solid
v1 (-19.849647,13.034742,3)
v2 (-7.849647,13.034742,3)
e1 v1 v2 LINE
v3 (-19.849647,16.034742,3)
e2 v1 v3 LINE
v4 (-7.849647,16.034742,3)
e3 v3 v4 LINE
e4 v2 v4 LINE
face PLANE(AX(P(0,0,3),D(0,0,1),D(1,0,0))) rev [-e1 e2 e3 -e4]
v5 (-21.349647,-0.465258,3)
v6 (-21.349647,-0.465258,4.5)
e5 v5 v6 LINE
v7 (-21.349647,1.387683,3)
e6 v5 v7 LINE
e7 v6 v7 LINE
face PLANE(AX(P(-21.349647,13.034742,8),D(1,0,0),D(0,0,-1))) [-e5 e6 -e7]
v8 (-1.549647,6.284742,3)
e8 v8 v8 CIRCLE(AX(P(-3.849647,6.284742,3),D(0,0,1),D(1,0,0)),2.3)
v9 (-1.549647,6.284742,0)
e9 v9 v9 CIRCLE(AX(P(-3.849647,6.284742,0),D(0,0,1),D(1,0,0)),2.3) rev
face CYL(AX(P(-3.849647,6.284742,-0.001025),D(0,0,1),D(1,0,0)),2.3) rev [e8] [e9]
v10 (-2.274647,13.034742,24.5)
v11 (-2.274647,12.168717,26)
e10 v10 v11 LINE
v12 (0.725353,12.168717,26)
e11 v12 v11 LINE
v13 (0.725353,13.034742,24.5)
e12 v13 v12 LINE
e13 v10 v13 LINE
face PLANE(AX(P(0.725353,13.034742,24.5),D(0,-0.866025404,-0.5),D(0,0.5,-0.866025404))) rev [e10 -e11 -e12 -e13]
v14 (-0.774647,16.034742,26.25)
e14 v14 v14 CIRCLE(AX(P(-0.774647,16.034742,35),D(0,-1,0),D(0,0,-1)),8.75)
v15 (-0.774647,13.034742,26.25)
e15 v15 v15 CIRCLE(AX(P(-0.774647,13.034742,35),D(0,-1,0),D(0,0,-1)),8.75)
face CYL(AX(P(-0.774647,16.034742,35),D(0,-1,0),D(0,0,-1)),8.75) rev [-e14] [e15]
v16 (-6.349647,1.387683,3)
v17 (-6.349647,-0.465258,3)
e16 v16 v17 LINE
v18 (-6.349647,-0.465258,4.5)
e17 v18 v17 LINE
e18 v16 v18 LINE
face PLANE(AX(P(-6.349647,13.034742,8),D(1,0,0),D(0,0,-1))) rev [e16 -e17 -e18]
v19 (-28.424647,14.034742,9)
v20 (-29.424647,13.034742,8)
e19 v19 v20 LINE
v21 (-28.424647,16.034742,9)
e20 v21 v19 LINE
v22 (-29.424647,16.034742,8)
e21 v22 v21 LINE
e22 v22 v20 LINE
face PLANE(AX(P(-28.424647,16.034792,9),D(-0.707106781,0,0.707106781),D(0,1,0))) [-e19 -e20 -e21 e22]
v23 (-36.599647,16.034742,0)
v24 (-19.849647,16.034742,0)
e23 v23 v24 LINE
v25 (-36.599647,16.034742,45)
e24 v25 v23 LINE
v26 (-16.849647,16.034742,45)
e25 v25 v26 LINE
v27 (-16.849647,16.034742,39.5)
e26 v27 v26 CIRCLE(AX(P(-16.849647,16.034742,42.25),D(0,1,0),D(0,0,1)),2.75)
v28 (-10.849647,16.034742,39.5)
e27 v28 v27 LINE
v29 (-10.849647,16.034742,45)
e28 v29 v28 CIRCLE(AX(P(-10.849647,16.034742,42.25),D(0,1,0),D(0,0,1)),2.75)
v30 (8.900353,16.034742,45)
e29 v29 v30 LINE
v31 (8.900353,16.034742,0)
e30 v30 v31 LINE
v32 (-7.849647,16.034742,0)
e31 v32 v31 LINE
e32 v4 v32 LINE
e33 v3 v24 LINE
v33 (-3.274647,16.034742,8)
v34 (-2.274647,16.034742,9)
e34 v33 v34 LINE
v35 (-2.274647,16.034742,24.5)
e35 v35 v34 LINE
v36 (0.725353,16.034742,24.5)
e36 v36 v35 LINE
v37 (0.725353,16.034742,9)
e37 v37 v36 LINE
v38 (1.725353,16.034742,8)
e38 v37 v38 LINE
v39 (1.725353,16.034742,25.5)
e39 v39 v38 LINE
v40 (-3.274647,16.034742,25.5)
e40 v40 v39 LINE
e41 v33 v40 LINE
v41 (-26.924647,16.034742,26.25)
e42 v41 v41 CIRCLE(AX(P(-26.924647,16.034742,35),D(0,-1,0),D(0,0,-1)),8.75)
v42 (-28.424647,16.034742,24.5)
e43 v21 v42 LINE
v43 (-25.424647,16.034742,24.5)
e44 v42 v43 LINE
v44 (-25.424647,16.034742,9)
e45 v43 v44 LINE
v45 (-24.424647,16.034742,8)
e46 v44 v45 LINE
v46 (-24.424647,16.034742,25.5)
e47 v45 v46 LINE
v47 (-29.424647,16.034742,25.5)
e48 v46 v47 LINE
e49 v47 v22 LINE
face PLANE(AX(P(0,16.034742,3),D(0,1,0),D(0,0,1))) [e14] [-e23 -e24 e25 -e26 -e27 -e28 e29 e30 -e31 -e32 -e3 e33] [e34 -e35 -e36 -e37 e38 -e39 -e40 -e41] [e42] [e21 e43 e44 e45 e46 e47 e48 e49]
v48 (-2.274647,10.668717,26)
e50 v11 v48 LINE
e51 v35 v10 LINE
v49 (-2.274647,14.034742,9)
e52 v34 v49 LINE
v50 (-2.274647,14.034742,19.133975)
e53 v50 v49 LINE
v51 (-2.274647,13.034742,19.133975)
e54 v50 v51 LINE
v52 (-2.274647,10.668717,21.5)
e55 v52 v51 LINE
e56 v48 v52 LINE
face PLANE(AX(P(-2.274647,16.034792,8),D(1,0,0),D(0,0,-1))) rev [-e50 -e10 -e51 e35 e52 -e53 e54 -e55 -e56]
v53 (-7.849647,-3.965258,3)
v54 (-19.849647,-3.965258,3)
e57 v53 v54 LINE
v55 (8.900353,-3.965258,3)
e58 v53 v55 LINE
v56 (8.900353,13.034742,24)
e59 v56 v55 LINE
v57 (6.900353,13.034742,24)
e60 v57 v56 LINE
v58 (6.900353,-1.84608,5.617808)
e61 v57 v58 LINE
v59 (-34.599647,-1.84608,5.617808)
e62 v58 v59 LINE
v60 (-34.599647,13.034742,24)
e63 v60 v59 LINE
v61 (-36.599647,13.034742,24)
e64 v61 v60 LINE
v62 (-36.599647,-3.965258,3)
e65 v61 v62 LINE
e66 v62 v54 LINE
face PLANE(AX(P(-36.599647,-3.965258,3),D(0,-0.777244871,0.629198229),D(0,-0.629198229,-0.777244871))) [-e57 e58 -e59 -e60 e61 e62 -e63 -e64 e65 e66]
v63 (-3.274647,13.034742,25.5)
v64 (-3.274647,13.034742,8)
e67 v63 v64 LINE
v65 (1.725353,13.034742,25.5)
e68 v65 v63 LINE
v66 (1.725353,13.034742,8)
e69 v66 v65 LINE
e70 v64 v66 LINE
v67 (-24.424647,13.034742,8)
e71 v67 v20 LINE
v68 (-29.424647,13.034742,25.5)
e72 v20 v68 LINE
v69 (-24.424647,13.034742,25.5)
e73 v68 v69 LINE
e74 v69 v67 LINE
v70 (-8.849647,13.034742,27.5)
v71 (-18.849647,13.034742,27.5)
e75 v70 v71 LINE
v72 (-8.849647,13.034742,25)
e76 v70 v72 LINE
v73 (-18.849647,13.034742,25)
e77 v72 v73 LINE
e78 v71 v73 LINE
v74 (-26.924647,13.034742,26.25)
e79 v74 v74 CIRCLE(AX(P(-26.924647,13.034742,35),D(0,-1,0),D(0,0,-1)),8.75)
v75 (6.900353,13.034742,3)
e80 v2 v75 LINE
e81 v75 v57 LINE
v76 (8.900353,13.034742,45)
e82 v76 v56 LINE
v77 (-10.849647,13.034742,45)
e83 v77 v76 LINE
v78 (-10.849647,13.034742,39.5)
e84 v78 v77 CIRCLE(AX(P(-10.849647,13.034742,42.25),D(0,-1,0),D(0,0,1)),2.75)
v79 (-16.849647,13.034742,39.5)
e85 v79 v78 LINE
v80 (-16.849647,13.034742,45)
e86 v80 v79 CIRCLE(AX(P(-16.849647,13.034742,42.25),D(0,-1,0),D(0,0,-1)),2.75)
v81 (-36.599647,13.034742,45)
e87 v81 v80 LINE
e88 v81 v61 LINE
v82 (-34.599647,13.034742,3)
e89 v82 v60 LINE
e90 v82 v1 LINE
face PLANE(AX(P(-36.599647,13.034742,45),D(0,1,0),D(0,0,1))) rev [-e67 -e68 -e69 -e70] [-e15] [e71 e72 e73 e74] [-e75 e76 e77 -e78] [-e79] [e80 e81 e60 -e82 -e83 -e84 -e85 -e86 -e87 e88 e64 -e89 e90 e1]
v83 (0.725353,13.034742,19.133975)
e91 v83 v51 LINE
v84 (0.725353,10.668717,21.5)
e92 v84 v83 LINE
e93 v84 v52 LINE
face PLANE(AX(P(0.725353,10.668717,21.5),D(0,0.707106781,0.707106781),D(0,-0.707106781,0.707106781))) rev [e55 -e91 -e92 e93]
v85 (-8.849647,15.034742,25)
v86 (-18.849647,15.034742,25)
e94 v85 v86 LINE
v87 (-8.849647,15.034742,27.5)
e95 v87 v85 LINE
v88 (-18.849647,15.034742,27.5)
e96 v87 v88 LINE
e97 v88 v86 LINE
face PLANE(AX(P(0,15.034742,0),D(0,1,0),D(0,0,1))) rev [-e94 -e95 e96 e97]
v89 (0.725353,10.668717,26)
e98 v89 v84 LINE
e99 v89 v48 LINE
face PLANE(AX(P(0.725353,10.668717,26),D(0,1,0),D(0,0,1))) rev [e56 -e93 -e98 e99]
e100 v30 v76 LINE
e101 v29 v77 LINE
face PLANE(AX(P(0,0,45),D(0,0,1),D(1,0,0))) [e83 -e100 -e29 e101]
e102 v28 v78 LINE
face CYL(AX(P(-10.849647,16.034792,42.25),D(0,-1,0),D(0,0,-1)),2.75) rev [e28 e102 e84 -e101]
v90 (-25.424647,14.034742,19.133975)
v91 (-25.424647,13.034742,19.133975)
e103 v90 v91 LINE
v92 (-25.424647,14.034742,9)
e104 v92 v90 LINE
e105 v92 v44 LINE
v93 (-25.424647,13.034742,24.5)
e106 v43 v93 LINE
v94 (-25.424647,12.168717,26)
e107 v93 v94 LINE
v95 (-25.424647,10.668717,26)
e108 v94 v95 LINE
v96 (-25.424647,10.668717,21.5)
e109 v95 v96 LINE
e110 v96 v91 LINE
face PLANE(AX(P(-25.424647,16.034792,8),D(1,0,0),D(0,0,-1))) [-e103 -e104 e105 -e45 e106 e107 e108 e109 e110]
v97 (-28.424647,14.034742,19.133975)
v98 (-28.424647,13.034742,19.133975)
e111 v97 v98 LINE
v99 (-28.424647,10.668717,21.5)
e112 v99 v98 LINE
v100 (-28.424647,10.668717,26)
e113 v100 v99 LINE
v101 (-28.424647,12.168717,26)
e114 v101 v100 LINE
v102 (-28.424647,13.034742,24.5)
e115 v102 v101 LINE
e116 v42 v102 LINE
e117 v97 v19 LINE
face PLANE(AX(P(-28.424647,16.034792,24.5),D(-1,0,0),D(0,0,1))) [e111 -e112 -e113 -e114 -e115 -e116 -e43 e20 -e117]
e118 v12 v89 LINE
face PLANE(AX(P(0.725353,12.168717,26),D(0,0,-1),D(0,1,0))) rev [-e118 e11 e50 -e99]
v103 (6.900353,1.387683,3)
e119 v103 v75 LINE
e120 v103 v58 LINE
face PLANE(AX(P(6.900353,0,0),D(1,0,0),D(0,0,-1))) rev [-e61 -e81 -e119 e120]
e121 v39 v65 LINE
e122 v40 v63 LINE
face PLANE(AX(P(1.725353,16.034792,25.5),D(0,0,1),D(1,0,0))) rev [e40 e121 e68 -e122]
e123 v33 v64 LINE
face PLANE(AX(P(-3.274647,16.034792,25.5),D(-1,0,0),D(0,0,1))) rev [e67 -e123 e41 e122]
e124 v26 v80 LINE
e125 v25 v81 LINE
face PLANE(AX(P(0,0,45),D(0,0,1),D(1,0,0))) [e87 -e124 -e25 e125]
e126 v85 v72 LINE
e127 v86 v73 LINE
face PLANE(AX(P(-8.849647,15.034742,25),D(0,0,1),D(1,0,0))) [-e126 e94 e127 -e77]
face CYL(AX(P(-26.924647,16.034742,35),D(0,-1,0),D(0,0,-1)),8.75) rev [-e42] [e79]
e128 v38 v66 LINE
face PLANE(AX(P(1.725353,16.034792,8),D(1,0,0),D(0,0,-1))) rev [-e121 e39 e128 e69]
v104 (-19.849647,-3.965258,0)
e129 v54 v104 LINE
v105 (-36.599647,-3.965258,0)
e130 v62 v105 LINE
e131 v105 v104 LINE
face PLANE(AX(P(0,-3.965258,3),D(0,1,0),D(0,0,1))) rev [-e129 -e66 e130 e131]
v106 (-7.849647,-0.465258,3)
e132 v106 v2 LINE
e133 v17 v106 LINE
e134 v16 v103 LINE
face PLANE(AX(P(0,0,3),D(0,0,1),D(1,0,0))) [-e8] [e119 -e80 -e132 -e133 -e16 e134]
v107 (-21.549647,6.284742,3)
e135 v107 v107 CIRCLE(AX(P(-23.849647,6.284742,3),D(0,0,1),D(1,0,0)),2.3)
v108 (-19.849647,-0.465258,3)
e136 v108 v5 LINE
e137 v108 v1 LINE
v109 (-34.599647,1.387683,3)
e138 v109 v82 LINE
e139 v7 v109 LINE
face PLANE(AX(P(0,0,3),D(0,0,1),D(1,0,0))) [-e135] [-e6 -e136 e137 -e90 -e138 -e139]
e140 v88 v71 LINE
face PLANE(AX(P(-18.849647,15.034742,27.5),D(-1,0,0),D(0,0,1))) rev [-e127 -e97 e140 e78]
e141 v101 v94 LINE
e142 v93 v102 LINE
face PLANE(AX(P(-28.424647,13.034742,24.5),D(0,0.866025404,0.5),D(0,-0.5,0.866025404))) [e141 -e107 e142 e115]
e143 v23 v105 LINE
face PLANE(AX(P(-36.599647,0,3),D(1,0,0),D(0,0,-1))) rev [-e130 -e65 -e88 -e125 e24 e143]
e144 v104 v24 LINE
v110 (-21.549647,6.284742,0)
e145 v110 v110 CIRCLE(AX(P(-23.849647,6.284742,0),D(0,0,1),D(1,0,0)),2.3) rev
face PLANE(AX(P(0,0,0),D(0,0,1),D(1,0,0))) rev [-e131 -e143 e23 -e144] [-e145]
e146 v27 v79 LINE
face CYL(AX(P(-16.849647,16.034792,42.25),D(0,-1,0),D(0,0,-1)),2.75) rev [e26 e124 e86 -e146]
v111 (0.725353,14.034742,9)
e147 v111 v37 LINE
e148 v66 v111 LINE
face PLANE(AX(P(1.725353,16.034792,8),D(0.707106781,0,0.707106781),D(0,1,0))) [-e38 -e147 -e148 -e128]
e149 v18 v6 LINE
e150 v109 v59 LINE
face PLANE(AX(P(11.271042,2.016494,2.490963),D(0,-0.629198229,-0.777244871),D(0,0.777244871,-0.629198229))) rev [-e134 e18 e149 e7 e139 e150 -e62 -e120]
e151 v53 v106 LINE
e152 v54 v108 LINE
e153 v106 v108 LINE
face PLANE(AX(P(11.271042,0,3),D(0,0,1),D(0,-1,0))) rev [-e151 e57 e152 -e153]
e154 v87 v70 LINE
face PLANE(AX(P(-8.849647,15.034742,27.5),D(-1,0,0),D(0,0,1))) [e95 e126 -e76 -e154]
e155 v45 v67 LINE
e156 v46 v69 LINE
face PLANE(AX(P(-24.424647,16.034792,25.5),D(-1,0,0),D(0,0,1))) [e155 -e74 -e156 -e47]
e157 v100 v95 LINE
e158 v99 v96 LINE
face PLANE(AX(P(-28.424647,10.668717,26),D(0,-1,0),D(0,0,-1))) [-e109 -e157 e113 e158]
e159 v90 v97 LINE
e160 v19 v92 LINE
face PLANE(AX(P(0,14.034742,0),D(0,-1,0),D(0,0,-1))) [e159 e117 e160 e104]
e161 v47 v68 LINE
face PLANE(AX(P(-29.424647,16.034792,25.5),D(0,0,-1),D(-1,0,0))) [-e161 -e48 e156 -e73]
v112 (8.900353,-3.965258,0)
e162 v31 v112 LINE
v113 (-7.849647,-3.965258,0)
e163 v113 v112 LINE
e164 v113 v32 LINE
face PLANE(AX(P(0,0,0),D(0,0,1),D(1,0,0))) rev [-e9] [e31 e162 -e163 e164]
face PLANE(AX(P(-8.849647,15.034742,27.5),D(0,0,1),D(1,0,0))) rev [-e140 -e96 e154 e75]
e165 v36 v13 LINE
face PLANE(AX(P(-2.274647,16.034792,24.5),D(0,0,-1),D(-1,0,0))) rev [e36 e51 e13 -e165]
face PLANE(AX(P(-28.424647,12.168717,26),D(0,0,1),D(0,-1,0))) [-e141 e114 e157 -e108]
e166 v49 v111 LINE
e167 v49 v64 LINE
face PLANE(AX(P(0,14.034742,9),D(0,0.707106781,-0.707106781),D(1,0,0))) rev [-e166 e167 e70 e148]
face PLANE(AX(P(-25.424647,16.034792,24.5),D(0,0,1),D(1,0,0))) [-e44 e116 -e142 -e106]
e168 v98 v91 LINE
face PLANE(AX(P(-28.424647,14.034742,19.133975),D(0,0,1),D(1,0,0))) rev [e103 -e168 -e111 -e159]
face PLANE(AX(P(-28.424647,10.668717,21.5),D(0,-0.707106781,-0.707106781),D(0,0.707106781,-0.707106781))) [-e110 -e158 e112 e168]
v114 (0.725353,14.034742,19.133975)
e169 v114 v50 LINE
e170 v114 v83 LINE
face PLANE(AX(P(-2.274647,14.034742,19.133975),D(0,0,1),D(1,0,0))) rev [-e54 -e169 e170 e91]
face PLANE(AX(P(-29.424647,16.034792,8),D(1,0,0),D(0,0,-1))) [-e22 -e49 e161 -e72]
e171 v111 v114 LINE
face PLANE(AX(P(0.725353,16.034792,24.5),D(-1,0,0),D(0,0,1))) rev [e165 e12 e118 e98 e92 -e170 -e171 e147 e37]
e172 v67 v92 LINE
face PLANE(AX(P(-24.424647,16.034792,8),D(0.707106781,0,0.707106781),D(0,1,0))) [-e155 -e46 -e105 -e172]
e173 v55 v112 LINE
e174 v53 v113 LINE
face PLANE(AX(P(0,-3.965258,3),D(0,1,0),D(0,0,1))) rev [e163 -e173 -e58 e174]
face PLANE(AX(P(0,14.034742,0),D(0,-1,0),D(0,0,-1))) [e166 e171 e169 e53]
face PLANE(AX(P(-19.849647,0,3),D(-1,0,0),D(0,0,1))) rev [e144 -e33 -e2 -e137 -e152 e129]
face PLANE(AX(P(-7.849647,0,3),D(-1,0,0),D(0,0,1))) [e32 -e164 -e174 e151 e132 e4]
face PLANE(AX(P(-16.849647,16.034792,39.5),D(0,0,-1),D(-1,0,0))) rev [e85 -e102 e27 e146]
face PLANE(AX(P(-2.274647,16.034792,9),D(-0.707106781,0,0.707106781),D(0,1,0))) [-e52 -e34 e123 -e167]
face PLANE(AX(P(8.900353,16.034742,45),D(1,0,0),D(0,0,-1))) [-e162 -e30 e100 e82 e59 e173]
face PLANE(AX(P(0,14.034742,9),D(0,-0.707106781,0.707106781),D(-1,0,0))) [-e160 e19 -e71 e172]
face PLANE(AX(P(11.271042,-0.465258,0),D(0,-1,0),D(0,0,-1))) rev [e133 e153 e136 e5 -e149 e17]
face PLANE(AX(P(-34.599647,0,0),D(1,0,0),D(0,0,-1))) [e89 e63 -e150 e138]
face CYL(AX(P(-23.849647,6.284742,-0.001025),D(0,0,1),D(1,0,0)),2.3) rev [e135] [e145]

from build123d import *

# Parameters (mm, degrees)
SKETCH1_W               = 16.75
SKETCH1_H               = 20
BOSS_EXTRUDE1_DEPTH     = 3
BOSS_EXTRUDE1_2_DEPTH   = 3
SKETCH2_W               = 45.5
SKETCH2_H               = 3
BOSS_EXTRUDE2_DEPTH     = 42
SKETCH3_R               = 8.75
CUT_EXTRUDE1_DEPTH      = 61.44447165
BOSS_EXTRUDE3_DEPTH     = 2
LPATTERN1_COUNT         = 2
LPATTERN1_PITCH         = 43.5
CUT_EXTRUDE2_DEPTH      = 61.44447165
BOSS_EXTRUDE4_DEPTH     = 3
CUT_EXTRUDE3_DEPTH      = 61.44447165
SKETCH10_W              = 10
SKETCH10_H              = 2.5
CUT_EXTRUDE4_DEPTH      = 2
BOSS_EXTRUDE5_REACH     = 66.609
SKETCH13_W              = 3
SKETCH13_H              = 11.133974596
CUT_EXTRUDE6_DEPTH      = 1
CHAMFER1_SIZE           = 1
BOSS_EXTRUDE6_DEPTH     = 13.25
CHAMFER2_SIZE           = 1
ENL_V_MAT_EXTRU_1_REACH = 59.971
ESQUISSE1_R             = 2.3


with BuildPart() as part:
    # Sketch1 → Boss-Extrude1 (new body)
    with BuildSketch(Plane.XY):
        with Locations((-28.224646897, 6.034741944)):
            Rectangle(SKETCH1_W, SKETCH1_H)
    extrude(amount=BOSS_EXTRUDE1_DEPTH)


with BuildPart() as body_2:
    # Sketch1 → Boss-Extrude1 2 (new body)
    with BuildSketch(Plane.XY):
        with Locations((0.525353103, 6.034741944)):
            Rectangle(SKETCH1_W, SKETCH1_H)
    extrude(amount=BOSS_EXTRUDE1_2_DEPTH)



with BuildPart() as body_3:
    # Sketch2 → Boss-Extrude2 (new body)
    with BuildSketch(Plane.XY.offset(3)):
        with Locations((-13.849646897, 14.534741944)):
            Rectangle(SKETCH2_W, SKETCH2_H)
    extrude(amount=BOSS_EXTRUDE2_DEPTH)

    # Sketch3 → Cut-Extrude1 (cut, through all)
    with BuildSketch(Plane(origin=(0, 13.034741944, 0), x_dir=(-1, 0, 0), z_dir=(0, -1, 0))):
        with Locations(Location((26.924646897, -35, 0), (0, 0, 90))):
            Circle(SKETCH3_R)
        with Locations(Location((0.774646897, -35, 0), (0, 0, 90))):
            Circle(SKETCH3_R)
    extrude(amount=-CUT_EXTRUDE1_DEPTH, mode=Mode.SUBTRACT)


with BuildPart() as body_2_1:
    add(body_2.part)

    add(body_3.part)  # Boss-Extrude3 merges body 3
    # Sketch4 → Boss-Extrude3 (add)
    with BuildSketch(Plane(origin=(8.900353103, 0, 0), x_dir=(0, 0, -1), z_dir=(1, 0, 0))):
        Polygon((-3, -3.965258056), (-24, 13.034741944), (-3, 13.034741944), align=None)
    boss_extrude3 = extrude(amount=-BOSS_EXTRUDE3_DEPTH)


with BuildPart() as part_1:
    add(part.part)

    add(body_2_1.part)  # LPattern1 merges body 2
    # LPattern1: Boss-Extrude3 ×2
    with Locations(*[(-i * LPATTERN1_PITCH, 0, 0) for i in range(1, LPATTERN1_COUNT)]):
        add(boss_extrude3)

    # Sketch5 → Cut-Extrude2 (cut, through all)
    with BuildSketch(Plane(origin=(0, 13.034741944, 0), x_dir=(-1, 0, 0), z_dir=(0, -1, 0))):
        Polygon((29.424646897, -8), (29.424646897, -25.5), (24.424646897, -25.5), (24.424646897, -8), (25.424646897, -8), (25.424646897, -24.5), (28.424646897, -24.5), (28.424646897, -8), align=None)
        Polygon((-0.725353103, -8), (-1.725353103, -8), (-1.725353103, -25.5), (3.274646897, -25.5), (3.274646897, -8), (2.274646897, -8), (2.274646897, -24.5), (-0.725353103, -24.5), align=None)
    extrude(amount=-CUT_EXTRUDE2_DEPTH, mode=Mode.SUBTRACT)

    # Sketch6 → Boss-Extrude4 (add)
    with BuildSketch(Plane(origin=(-25.424646897, 0, 0), x_dir=(0, 0, -1), z_dir=(1, 0, 0))):
        Polygon((-24.5, 13.034741944), (-26, 12.16871654), (-26, 10.66871654), (-21.5, 10.66871654), (-19.133974596, 13.034741944), align=None)
    boss_extrude4 = extrude(amount=-BOSS_EXTRUDE4_DEPTH)

    # Mirror7: Boss-Extrude4 across plane
    add(boss_extrude4.mirror(Plane(origin=(-13.849646897, 13.034741944, 8), x_dir=(0, 0, 1), z_dir=(1, 0, 0))))

    # Sketch9 → Cut-Extrude3 (cut, through all)
    with BuildSketch(Plane(origin=(0, 13.034741944, 0), x_dir=(-1, 0, 0), z_dir=(0, -1, 0))):
        with BuildLine():
            Line((16.849646897, -45), (10.849646897, -45))
            ThreePointArc((10.849646897, -45), (8.099646897, -42.25), (10.849646897, -39.5))
            Line((10.849646897, -39.5), (16.849646897, -39.5))
            ThreePointArc((16.849646897, -39.5), (19.599646897, -42.25), (16.849646897, -45))
        make_face()
    extrude(amount=-CUT_EXTRUDE3_DEPTH, mode=Mode.SUBTRACT)

    # Sketch10 → Cut-Extrude4 (cut)
    with BuildSketch(Plane(origin=(0, 13.034741944, 0), x_dir=(-1, 0, 0), z_dir=(0, -1, 0))):
        with Locations((13.849646897, -26.25)):
            Rectangle(SKETCH10_W, SKETCH10_H)
    extrude(amount=-CUT_EXTRUDE4_DEPTH, mode=Mode.SUBTRACT)

    # Boss-Extrude5: up to this face of the body (flat: up to its plane)
    boss_extrude5_end = Plane(part_1.part.faces().sort_by_distance((6.900353103, 7.368075277, 10))[0])
    # Sketch11 → Boss-Extrude5 (add, up to the picked face)
    with BuildSketch(Plane(origin=(-34.599646897, 0, 0), x_dir=(0, 0, -1), z_dir=(1, 0, 0)), mode=Mode.PRIVATE) as boss_extrude5_sk1:
        Polygon((-5.617808219, -1.846079974), (-3, -3.965258056), (-3, -0.465258056), (-4.5, -0.465258056), align=None)
    boss_extrude5_tool1 = split(extrude(boss_extrude5_sk1.sketch, amount=BOSS_EXTRUDE5_REACH, mode=Mode.PRIVATE), bisect_by=boss_extrude5_end, keep=Keep.BOTH, mode=Mode.PRIVATE)
    add(boss_extrude5_tool1.solids().sort_by(Axis((-34.599647, -1.87709, 3.964792), (1, 0, 0)))[0])

    # Sketch13 → Cut-Extrude6 (cut)
    with BuildSketch(Plane(origin=(0, 13.034741944, 0), x_dir=(-1, 0, 0), z_dir=(0, -1, 0))):
        with Locations((26.924646897, -13.566987298)):
            Rectangle(SKETCH13_W, SKETCH13_H)
        with Locations((0.774646897, -13.566987298)):
            Rectangle(SKETCH13_W, SKETCH13_H)
    extrude(amount=-CUT_EXTRUDE6_DEPTH, mode=Mode.SUBTRACT)

    # Chamfer1
    chamfer1_edges = [part_1.edges().sort_by_distance(p)[0] for p in [
        (-26.924646897, 14.034741944, 8),
        (-0.774646897, 14.034741944, 8),
    ]]
    chamfer(chamfer1_edges, length=CHAMFER1_SIZE - 0.0001)  # a hair under: the kernel refuses the full size

    # Sketch11<3> → Boss-Extrude6 (add)
    with BuildSketch(Plane(origin=(-34.599646897, 0, 0), x_dir=(0, 0, -1), z_dir=(1, 0, 0))):
        Polygon((-4.5, -0.465258056), (-3, -0.465258056), (-3, 1.38768312), align=None)
    boss_extrude6 = extrude(amount=BOSS_EXTRUDE6_DEPTH)

    # Mirror8: Boss-Extrude6 across plane
    add(boss_extrude6.mirror(Plane(origin=(-13.849646897, 13.034741944, 8), x_dir=(0, 0, 1), z_dir=(1, 0, 0))))

    # Chamfer2
    chamfer2_edges = [part_1.edges().sort_by_distance(p)[0] for p in [
        (-28.424646897, 14.534791944, 8),
        (-2.274646897, 14.534791944, 8),
        (-25.424646897, 14.534791944, 8),
        (0.725353103, 14.534791944, 8),
    ]]
    chamfer(chamfer2_edges, length=CHAMFER2_SIZE - 0.0001)  # a hair under: the kernel refuses the full size

    # Esquisse1 → Enlèv. mat.-Extru.1 (cut, up to next)
    with BuildSketch(Plane.XY.offset(3), mode=Mode.PRIVATE) as enl_v_mat_extru_1_sk1:
        with Locations((-3.849646897, 6.284741944)):
            Circle(ESQUISSE1_R)
    enl_v_mat_extru_1_tool1 = extrude(enl_v_mat_extru_1_sk1.sketch, amount=-ENL_V_MAT_EXTRU_1_REACH, mode=Mode.PRIVATE) & part_1.part
    # Esquisse1 → Enlèv. mat.-Extru.1 (cut, up to next)
    with BuildSketch(Plane.XY.offset(3), mode=Mode.PRIVATE) as enl_v_mat_extru_1_sk2:
        with Locations((-23.849646897, 6.284741944)):
            Circle(ESQUISSE1_R)
    enl_v_mat_extru_1_tool2 = extrude(enl_v_mat_extru_1_sk2.sketch, amount=-ENL_V_MAT_EXTRU_1_REACH, mode=Mode.PRIVATE) & part_1.part
    add(enl_v_mat_extru_1_tool1.solids().sort_by_distance((-3.849647, 6.284742, 3))[0], mode=Mode.SUBTRACT)
    add(enl_v_mat_extru_1_tool2.solids().sort_by_distance((-23.849647, 6.284742, 3))[0], mode=Mode.SUBTRACT)


solid = part_1.part
